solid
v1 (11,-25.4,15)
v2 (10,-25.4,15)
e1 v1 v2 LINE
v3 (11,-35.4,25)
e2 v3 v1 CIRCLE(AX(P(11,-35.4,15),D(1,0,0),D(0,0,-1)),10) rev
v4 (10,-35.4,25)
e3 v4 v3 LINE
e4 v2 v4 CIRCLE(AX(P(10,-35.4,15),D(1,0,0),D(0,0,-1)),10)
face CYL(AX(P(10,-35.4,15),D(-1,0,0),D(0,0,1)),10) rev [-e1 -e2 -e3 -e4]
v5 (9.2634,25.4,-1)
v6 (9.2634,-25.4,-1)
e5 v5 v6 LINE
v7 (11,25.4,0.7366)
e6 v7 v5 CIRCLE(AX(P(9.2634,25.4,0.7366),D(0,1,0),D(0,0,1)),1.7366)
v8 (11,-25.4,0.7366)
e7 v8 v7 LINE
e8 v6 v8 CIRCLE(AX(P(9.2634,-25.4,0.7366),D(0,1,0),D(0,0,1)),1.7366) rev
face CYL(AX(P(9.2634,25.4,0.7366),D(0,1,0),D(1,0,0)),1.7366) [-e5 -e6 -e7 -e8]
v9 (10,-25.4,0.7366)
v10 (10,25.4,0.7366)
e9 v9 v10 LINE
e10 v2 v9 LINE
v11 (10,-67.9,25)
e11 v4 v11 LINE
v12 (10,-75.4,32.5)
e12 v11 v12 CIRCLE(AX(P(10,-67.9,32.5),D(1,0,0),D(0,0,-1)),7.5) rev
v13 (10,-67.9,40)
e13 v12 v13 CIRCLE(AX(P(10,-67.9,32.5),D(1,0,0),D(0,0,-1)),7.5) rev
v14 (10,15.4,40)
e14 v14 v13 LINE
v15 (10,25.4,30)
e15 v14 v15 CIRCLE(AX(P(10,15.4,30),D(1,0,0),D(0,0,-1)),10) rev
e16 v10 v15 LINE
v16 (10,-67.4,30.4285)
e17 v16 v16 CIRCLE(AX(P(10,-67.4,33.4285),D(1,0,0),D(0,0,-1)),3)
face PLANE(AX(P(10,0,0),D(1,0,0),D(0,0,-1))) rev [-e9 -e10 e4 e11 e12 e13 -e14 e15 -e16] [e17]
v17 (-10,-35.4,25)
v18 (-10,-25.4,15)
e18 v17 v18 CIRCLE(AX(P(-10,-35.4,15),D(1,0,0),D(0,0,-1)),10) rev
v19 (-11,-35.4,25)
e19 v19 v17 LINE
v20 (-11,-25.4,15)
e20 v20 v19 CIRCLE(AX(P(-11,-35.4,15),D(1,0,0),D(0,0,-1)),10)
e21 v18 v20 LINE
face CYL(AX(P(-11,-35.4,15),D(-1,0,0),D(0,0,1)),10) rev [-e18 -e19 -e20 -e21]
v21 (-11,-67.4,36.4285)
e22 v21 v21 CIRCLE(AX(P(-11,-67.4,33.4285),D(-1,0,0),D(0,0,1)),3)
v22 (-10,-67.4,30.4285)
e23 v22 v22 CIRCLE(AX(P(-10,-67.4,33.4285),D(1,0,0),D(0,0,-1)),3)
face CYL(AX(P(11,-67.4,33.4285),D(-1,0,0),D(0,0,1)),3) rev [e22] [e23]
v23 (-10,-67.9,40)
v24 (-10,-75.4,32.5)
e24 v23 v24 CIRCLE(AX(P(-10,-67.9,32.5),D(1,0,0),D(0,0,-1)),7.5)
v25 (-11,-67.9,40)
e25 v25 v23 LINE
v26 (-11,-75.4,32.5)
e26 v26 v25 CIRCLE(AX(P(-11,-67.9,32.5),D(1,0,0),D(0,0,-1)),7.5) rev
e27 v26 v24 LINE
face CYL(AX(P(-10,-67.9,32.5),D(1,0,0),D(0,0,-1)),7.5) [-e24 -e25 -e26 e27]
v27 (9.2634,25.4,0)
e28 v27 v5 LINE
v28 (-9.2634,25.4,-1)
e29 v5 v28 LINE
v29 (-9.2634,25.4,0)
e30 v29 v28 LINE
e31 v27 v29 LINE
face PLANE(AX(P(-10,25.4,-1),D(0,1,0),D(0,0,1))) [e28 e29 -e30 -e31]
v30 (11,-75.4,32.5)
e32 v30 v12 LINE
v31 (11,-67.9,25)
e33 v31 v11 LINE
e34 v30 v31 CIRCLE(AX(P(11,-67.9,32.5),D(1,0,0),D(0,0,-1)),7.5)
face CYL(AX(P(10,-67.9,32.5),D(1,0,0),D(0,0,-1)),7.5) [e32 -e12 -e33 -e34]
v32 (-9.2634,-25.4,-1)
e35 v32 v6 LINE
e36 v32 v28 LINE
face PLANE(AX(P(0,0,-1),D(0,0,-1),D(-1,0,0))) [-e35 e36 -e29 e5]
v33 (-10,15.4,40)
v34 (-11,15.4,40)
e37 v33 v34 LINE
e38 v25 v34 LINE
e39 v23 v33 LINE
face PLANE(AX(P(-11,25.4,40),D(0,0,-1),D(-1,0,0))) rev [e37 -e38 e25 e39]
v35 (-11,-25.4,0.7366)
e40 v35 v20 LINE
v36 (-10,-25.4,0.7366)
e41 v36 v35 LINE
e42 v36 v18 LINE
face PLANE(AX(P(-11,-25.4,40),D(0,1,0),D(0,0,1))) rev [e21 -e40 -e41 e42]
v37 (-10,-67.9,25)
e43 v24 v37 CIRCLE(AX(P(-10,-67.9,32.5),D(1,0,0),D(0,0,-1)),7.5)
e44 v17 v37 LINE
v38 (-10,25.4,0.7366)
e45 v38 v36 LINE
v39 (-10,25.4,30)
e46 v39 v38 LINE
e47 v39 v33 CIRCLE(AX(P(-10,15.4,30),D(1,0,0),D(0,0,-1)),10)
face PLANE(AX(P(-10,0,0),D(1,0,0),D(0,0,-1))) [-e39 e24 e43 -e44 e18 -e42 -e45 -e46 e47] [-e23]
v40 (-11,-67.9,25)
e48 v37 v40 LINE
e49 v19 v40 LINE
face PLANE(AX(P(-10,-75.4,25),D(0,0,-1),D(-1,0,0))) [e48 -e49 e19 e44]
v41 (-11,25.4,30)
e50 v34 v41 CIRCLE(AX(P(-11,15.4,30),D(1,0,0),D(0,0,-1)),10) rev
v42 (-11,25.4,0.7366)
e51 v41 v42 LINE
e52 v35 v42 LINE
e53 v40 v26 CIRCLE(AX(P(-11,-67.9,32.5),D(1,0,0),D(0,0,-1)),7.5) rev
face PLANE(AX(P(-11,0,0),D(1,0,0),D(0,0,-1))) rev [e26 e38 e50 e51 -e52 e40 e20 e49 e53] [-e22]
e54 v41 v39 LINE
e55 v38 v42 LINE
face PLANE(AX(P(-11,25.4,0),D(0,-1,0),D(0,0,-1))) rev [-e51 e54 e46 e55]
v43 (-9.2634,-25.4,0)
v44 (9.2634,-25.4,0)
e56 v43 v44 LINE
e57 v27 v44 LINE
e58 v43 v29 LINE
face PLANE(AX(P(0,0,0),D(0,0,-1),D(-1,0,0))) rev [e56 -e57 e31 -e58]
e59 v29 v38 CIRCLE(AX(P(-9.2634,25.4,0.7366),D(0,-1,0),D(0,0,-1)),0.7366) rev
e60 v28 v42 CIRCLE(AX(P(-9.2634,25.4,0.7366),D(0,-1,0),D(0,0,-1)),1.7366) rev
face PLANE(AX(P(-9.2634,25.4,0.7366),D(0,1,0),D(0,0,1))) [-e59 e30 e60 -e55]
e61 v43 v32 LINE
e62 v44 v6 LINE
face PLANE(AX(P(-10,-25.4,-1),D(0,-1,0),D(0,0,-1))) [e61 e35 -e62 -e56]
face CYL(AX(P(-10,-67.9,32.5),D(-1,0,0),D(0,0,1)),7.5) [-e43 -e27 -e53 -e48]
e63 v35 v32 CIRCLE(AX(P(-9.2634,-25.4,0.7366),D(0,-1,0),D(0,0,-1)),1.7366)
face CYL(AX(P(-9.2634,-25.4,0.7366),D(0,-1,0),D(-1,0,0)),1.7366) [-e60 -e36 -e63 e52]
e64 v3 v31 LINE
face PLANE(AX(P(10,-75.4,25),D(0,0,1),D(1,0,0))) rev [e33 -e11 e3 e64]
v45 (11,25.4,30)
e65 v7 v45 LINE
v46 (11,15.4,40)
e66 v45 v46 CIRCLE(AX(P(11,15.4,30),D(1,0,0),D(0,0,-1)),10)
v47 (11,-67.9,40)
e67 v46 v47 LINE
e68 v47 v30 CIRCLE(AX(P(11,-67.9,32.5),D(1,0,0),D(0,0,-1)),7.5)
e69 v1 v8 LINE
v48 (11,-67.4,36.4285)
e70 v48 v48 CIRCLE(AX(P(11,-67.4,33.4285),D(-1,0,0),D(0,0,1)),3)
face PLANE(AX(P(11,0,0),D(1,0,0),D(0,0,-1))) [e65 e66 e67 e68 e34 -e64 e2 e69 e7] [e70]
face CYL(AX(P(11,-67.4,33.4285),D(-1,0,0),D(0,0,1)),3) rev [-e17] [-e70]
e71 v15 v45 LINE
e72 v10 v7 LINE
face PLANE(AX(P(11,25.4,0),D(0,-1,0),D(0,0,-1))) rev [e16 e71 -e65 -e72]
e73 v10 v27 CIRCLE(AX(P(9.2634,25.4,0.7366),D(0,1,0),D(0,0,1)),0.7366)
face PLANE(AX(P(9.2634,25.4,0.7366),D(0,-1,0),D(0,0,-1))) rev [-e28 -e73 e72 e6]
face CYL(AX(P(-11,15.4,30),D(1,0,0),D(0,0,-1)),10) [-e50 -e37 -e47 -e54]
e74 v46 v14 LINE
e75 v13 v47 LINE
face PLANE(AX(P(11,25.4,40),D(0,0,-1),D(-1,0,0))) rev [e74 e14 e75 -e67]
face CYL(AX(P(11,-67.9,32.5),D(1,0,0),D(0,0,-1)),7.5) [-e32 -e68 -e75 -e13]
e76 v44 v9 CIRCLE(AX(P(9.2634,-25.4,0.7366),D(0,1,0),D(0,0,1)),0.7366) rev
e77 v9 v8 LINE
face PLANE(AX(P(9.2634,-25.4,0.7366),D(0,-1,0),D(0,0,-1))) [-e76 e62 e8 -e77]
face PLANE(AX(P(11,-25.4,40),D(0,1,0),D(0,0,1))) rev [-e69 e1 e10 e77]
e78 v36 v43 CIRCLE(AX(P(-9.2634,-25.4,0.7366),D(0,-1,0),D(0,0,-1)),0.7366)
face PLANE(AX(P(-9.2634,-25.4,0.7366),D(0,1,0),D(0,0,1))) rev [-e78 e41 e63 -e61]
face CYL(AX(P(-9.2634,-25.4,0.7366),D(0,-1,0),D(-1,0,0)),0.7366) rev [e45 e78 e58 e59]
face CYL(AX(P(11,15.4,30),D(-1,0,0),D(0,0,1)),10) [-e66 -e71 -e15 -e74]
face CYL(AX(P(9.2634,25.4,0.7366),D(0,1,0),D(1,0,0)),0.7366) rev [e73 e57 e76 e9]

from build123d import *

# Parameters (mm, degrees)
CROQUIS1_W                         = 20
CROQUIS1_H                         = 50.8
BRIDA_BASE1_DEPTH                  = 1
BRIDA_DE_ARISTA1_STRIP_W           = 5.4732
BRIDA_DE_ARISTA1_STRIP_H           = 1
BRIDA_DE_ARISTA1_STRIP_CUT_DEPTH   = 50.8
BRIDA_DE_ARISTA1_STRIP_2_W         = 5.4732
BRIDA_DE_ARISTA1_STRIP_2_H         = 1
BRIDA_DE_ARISTA1_STRIP_CUT_2_DEPTH = 50.8
BRIDA_DE_ARISTA1_DEPTH             = 50.8
BRIDA_DE_ARISTA1_BEND_DEPTH        = 50.8
CROQUIS14_W                        = 15
CROQUIS14_H                        = 50
PESTA_A1_DEPTH                     = 1
CROQUIS17_R                        = 3
CORTAR_EXTRUIR1_DEPTH              = 89.14283862
REDONDEO1_R                        = 10
REDONDEO2_R                        = 7.5


# Sheet-metal steps are written as plain solids
with BuildPart() as part:
    # Croquis1 → Brida base1 (new body)
    with BuildSketch(Plane.XY):
        Rectangle(CROQUIS1_W, CROQUIS1_H)
    extrude(amount=-BRIDA_BASE1_DEPTH)

    # Brida de arista1 strip (across the edge) → Brida de arista1 strip cut (cut)
    with BuildSketch(Plane(origin=(-10, 25.4, 0), x_dir=(1, 0, 0), z_dir=(0, -1, 0))):
        with Locations((-2, -0.5)):
            Rectangle(BRIDA_DE_ARISTA1_STRIP_W, BRIDA_DE_ARISTA1_STRIP_H)
    extrude(amount=BRIDA_DE_ARISTA1_STRIP_CUT_DEPTH, mode=Mode.SUBTRACT)

    # Brida de arista1 strip 2 (across the edge) → Brida de arista1 strip cut 2 (cut)
    with BuildSketch(Plane(origin=(10, -25.4, 0), x_dir=(-1, 0, 0), z_dir=(0, 1, 0))):
        with Locations((-2, -0.5)):
            Rectangle(BRIDA_DE_ARISTA1_STRIP_2_W, BRIDA_DE_ARISTA1_STRIP_2_H)
    extrude(amount=BRIDA_DE_ARISTA1_STRIP_CUT_2_DEPTH, mode=Mode.SUBTRACT)

    # Brida de arista1 section (across the edge) → Brida de arista1 (add)
    with BuildSketch(Plane(origin=(-10, 25.4, 0), x_dir=(1, 0, 0), z_dir=(0, -1, 0))):
        with BuildLine():
            Line((-1, 0.7366), (-1, 40))
            Line((-1, 40), (0, 40))
            Line((0, 40), (0, 0.7366))
            ThreePointArc((0, 0.7366), (0.215745145, 0.215745145), (0.7366, 0))
            Line((0.7366, 0), (0.7366, -1))
            ThreePointArc((0.7366, -1), (-0.491361636, -0.491361636), (-1, 0.7366))
        make_face()
    extrude(amount=BRIDA_DE_ARISTA1_DEPTH)

    # Brida de arista1 section 2 (across the edge) → Brida de arista1 bend (add)
    with BuildSketch(Plane(origin=(10, -25.4, 0), x_dir=(-1, 0, 0), z_dir=(0, 1, 0))):
        with BuildLine():
            Line((-1, 0.7366), (-1, 40))
            Line((-1, 40), (0, 40))
            Line((0, 40), (0, 0.7366))
            ThreePointArc((0, 0.7366), (0.215745145, 0.215745145), (0.7366, 0))
            Line((0.7366, 0), (0.7366, -1))
            ThreePointArc((0.7366, -1), (-0.491361636, -0.491361636), (-1, 0.7366))
        make_face()
    extrude(amount=BRIDA_DE_ARISTA1_BEND_DEPTH)

    # Croquis14 → Pestaña1 (add)
    with BuildSketch(Plane.ZY.offset(11)):
        with Locations((32.5, -50.4)):
            Rectangle(CROQUIS14_W, CROQUIS14_H)
    pesta_a1 = extrude(amount=-PESTA_A1_DEPTH)

    # Simetría1: Pestaña1 across plane
    add(pesta_a1.mirror(Plane(origin=(0, 0, 0), x_dir=(0, 0, 1), z_dir=(1, 0, 0))))

    # Croquis17 → Cortar-Extruir1 (cut, through all)
    with BuildSketch(Plane.ZY.offset(11)):
        with Locations((33.4285, -67.4)):
            Circle(CROQUIS17_R)
    extrude(amount=-CORTAR_EXTRUIR1_DEPTH, mode=Mode.SUBTRACT)

    # Redondeo1
    redondeo1_edges = [part.edges().sort_by_distance(p)[0] for p in [
        (-10.5, 25.4, 40),
        (10.5, 25.4, 40),
        (-10.5, -25.4, 25),
        (10.5, -25.4, 25),
    ]]
    fillet(redondeo1_edges, radius=REDONDEO1_R)

    # Redondeo2
    redondeo2_edges = [part.edges().sort_by_distance(p)[0] for p in [
        (10.5, -75.4, 25),
        (10.5, -75.4, 40),
        (-10.5, -75.4, 25),
        (-10.5, -75.4, 40),
    ]]
    fillet(redondeo2_edges, radius=REDONDEO2_R - 0.0001)  # a hair under: the kernel refuses the full size


solid = part.part
